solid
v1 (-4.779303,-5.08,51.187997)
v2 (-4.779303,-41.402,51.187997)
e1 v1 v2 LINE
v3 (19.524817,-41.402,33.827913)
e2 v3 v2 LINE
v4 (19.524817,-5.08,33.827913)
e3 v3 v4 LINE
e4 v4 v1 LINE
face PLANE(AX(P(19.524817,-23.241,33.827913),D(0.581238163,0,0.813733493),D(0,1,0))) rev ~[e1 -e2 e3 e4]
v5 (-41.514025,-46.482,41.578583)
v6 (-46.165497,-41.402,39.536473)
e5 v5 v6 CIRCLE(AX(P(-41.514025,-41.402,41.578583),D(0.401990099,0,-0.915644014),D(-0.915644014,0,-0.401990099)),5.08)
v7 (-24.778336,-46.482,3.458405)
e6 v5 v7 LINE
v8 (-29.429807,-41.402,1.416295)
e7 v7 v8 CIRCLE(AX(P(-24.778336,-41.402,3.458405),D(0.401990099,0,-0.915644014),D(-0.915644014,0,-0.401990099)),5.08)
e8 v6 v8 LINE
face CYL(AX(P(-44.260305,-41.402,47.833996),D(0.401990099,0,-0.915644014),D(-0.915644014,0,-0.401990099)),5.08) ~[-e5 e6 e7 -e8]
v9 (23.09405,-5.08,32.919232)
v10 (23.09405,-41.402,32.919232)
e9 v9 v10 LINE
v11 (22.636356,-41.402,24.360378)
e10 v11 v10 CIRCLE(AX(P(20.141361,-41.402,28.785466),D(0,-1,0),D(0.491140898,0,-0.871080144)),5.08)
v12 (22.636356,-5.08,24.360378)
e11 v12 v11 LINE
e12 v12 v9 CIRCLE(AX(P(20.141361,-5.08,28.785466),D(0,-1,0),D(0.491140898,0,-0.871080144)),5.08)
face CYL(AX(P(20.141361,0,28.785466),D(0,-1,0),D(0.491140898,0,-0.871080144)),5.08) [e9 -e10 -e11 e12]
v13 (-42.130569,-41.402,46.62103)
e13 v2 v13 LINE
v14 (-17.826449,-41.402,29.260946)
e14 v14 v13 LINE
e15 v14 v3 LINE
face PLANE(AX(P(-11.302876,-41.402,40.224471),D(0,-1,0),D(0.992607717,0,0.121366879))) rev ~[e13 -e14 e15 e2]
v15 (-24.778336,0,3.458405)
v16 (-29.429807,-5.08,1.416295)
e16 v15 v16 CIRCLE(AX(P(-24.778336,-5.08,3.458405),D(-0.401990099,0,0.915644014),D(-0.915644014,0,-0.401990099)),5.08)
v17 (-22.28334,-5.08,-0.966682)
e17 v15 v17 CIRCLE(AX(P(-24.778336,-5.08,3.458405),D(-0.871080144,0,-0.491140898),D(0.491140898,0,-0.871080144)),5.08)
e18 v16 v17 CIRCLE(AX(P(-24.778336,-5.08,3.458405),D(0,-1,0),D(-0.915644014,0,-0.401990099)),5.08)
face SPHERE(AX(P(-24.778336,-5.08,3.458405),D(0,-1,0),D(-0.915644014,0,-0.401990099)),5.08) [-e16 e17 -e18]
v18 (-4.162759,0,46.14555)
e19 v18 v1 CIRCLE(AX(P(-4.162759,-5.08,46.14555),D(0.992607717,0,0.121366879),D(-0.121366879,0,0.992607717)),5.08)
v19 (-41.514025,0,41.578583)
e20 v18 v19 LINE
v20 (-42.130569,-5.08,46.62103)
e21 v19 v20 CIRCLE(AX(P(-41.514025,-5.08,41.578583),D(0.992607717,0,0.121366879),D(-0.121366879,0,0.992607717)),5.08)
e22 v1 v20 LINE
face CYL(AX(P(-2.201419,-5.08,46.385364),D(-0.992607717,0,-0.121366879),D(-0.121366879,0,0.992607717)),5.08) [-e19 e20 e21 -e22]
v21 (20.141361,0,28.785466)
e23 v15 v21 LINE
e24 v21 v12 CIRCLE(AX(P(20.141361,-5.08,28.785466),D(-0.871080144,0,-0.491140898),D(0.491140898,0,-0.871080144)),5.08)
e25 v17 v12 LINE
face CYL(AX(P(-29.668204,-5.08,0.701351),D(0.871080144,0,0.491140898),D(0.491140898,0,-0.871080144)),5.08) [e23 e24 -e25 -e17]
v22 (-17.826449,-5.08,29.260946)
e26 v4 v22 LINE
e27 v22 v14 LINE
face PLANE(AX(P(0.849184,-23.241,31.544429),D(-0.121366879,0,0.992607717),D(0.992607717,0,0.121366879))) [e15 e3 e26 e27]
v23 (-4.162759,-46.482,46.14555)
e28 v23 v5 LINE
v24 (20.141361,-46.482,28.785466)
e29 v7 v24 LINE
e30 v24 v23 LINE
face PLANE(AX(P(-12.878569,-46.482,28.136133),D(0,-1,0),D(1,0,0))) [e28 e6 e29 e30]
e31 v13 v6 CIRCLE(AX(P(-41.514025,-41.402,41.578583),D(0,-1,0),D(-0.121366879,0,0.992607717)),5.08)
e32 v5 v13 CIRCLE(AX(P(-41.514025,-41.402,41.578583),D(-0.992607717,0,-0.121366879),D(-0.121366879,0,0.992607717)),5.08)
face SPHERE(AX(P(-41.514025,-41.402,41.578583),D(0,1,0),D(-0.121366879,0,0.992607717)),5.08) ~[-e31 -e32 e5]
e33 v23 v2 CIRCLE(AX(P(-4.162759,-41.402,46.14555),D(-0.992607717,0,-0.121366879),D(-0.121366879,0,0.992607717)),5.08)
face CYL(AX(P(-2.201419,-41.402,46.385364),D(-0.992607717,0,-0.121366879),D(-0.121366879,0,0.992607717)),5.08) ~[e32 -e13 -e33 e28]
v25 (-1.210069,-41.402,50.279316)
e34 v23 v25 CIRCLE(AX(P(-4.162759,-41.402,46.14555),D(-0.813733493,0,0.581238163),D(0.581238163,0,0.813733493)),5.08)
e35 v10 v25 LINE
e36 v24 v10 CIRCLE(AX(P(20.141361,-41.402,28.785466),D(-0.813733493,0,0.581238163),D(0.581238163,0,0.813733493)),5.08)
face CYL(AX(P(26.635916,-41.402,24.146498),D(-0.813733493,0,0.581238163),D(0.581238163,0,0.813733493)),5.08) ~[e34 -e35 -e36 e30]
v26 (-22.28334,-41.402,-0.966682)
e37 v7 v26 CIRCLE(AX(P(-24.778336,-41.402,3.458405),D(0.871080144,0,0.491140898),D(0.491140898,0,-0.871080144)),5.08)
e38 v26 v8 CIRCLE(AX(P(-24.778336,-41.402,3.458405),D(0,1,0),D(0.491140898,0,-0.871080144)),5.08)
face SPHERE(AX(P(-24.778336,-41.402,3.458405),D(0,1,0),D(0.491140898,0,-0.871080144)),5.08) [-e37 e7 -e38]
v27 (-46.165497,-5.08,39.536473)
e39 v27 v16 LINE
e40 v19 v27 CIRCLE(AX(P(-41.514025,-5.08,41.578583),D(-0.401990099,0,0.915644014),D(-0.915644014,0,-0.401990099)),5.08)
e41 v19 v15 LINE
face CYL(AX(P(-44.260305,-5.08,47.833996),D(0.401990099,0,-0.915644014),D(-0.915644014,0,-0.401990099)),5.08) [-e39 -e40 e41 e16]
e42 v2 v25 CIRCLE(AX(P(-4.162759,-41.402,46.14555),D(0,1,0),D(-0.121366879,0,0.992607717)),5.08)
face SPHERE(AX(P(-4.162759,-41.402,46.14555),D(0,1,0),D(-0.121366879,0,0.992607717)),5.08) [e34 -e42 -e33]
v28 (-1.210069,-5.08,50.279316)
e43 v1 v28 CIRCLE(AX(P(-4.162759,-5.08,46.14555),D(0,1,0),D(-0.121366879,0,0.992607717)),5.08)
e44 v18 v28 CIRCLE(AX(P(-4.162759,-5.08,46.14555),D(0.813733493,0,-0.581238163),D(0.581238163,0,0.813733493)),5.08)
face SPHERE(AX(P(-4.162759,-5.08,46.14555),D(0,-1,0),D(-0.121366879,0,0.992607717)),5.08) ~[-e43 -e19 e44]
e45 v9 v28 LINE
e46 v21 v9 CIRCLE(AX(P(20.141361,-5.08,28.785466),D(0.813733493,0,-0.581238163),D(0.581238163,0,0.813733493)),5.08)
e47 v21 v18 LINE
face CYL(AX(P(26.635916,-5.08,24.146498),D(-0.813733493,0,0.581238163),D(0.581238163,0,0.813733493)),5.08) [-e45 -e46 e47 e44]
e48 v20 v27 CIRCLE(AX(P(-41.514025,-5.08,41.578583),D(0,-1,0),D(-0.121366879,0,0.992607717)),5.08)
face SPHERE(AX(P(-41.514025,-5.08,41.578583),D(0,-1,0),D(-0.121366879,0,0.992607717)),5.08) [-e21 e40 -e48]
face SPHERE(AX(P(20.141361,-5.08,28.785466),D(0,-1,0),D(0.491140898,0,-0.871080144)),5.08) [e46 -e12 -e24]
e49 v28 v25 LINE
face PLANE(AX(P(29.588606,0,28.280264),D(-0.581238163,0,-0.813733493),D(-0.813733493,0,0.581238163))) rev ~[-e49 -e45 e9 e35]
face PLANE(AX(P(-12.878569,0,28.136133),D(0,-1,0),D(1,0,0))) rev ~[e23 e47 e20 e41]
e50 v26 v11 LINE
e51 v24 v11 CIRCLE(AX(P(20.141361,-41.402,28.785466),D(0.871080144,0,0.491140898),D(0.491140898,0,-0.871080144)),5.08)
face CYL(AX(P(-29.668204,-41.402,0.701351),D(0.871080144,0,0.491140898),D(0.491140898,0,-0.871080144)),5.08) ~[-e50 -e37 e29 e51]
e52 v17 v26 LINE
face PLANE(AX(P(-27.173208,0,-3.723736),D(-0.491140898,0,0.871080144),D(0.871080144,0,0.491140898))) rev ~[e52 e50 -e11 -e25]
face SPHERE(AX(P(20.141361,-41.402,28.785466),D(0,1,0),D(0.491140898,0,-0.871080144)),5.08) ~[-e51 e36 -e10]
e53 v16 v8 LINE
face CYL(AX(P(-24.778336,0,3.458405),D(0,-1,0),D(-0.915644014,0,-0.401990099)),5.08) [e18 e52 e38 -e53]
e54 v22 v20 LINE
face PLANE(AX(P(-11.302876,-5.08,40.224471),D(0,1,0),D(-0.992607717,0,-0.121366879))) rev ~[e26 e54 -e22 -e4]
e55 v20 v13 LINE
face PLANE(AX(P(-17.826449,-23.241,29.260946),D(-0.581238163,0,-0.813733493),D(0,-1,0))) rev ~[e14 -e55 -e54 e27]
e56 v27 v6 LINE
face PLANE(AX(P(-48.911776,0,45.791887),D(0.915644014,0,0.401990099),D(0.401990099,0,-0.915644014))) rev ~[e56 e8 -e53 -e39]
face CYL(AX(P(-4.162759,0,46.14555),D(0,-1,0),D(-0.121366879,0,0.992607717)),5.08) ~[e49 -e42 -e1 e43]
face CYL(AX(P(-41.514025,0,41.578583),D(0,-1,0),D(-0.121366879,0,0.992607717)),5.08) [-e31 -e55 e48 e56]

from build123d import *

# Parameters (mm, degrees)
F1_DEPTH   = 46.482
F3_R       = 5.08
F1_FACE1_W = 37.6294337092
F1_FACE1_H = 36.322


# Not quite as in the source:
# - a feature of the source that left no trace in its solid (it failed there, or was rolled back) is left out


with BuildPart() as f1:
    # F0 (on Front) → F1 (new body)
    with BuildSketch(Plane.XZ):
        Polygon((-2.8179630172, 51.4278113842), (-48.9117763937, 45.7918867469), (-27.1732080728, -3.7237356883), (29.5886062086, 28.2802637666), align=None)
    extrude(amount=F1_DEPTH)

    # F3
    f3_edges = [f1.edges().sort_by_distance(p)[0] for p in [
        (-2.817963, -23.241, 51.427811),
        (-48.911776, -23.241, 45.791887),
        (-25.86487, 0, 48.609849),
        (-25.86487, -46.482, 48.609849),
        (-38.042492, 0, 21.034076),
        (1.207699, 0, 12.278264),
        (13.385322, 0, 39.854038),
        (-27.173208, -23.241, -3.723736),
        (29.588606, -23.241, 28.280264),
        (1.207699, -46.482, 12.278264),
        (-38.042492, -46.482, 21.034076),
        (13.385322, -46.482, 39.854038),
    ]]
    fillet(f3_edges, radius=F3_R)

    # F4: sweep along a path in F4_path
    with BuildLine(Plane(origin=(23.0940504855, -41.402, 32.9192317736), x_dir=(0.8137334929, 0, -0.5812381633), z_dir=(-0.5812381633, 0, -0.8137334929))) as f4_path:
        Line((0, 0), (-29.867419561, 0))
    # F1_face1 (on face) → F4 (sweep, cut)
    with BuildSketch(Plane(origin=(-25.8648697054, -23.241, 48.6098490655), x_dir=(1, 0, 0), z_dir=(-0.1213668794, 0, 0.9926077174))):
        with Locations((2.4278813649, 0)):
            Rectangle(F1_FACE1_W, F1_FACE1_H)
    sweep(path=f4_path.line, mode=Mode.SUBTRACT)


solid = f1.part
